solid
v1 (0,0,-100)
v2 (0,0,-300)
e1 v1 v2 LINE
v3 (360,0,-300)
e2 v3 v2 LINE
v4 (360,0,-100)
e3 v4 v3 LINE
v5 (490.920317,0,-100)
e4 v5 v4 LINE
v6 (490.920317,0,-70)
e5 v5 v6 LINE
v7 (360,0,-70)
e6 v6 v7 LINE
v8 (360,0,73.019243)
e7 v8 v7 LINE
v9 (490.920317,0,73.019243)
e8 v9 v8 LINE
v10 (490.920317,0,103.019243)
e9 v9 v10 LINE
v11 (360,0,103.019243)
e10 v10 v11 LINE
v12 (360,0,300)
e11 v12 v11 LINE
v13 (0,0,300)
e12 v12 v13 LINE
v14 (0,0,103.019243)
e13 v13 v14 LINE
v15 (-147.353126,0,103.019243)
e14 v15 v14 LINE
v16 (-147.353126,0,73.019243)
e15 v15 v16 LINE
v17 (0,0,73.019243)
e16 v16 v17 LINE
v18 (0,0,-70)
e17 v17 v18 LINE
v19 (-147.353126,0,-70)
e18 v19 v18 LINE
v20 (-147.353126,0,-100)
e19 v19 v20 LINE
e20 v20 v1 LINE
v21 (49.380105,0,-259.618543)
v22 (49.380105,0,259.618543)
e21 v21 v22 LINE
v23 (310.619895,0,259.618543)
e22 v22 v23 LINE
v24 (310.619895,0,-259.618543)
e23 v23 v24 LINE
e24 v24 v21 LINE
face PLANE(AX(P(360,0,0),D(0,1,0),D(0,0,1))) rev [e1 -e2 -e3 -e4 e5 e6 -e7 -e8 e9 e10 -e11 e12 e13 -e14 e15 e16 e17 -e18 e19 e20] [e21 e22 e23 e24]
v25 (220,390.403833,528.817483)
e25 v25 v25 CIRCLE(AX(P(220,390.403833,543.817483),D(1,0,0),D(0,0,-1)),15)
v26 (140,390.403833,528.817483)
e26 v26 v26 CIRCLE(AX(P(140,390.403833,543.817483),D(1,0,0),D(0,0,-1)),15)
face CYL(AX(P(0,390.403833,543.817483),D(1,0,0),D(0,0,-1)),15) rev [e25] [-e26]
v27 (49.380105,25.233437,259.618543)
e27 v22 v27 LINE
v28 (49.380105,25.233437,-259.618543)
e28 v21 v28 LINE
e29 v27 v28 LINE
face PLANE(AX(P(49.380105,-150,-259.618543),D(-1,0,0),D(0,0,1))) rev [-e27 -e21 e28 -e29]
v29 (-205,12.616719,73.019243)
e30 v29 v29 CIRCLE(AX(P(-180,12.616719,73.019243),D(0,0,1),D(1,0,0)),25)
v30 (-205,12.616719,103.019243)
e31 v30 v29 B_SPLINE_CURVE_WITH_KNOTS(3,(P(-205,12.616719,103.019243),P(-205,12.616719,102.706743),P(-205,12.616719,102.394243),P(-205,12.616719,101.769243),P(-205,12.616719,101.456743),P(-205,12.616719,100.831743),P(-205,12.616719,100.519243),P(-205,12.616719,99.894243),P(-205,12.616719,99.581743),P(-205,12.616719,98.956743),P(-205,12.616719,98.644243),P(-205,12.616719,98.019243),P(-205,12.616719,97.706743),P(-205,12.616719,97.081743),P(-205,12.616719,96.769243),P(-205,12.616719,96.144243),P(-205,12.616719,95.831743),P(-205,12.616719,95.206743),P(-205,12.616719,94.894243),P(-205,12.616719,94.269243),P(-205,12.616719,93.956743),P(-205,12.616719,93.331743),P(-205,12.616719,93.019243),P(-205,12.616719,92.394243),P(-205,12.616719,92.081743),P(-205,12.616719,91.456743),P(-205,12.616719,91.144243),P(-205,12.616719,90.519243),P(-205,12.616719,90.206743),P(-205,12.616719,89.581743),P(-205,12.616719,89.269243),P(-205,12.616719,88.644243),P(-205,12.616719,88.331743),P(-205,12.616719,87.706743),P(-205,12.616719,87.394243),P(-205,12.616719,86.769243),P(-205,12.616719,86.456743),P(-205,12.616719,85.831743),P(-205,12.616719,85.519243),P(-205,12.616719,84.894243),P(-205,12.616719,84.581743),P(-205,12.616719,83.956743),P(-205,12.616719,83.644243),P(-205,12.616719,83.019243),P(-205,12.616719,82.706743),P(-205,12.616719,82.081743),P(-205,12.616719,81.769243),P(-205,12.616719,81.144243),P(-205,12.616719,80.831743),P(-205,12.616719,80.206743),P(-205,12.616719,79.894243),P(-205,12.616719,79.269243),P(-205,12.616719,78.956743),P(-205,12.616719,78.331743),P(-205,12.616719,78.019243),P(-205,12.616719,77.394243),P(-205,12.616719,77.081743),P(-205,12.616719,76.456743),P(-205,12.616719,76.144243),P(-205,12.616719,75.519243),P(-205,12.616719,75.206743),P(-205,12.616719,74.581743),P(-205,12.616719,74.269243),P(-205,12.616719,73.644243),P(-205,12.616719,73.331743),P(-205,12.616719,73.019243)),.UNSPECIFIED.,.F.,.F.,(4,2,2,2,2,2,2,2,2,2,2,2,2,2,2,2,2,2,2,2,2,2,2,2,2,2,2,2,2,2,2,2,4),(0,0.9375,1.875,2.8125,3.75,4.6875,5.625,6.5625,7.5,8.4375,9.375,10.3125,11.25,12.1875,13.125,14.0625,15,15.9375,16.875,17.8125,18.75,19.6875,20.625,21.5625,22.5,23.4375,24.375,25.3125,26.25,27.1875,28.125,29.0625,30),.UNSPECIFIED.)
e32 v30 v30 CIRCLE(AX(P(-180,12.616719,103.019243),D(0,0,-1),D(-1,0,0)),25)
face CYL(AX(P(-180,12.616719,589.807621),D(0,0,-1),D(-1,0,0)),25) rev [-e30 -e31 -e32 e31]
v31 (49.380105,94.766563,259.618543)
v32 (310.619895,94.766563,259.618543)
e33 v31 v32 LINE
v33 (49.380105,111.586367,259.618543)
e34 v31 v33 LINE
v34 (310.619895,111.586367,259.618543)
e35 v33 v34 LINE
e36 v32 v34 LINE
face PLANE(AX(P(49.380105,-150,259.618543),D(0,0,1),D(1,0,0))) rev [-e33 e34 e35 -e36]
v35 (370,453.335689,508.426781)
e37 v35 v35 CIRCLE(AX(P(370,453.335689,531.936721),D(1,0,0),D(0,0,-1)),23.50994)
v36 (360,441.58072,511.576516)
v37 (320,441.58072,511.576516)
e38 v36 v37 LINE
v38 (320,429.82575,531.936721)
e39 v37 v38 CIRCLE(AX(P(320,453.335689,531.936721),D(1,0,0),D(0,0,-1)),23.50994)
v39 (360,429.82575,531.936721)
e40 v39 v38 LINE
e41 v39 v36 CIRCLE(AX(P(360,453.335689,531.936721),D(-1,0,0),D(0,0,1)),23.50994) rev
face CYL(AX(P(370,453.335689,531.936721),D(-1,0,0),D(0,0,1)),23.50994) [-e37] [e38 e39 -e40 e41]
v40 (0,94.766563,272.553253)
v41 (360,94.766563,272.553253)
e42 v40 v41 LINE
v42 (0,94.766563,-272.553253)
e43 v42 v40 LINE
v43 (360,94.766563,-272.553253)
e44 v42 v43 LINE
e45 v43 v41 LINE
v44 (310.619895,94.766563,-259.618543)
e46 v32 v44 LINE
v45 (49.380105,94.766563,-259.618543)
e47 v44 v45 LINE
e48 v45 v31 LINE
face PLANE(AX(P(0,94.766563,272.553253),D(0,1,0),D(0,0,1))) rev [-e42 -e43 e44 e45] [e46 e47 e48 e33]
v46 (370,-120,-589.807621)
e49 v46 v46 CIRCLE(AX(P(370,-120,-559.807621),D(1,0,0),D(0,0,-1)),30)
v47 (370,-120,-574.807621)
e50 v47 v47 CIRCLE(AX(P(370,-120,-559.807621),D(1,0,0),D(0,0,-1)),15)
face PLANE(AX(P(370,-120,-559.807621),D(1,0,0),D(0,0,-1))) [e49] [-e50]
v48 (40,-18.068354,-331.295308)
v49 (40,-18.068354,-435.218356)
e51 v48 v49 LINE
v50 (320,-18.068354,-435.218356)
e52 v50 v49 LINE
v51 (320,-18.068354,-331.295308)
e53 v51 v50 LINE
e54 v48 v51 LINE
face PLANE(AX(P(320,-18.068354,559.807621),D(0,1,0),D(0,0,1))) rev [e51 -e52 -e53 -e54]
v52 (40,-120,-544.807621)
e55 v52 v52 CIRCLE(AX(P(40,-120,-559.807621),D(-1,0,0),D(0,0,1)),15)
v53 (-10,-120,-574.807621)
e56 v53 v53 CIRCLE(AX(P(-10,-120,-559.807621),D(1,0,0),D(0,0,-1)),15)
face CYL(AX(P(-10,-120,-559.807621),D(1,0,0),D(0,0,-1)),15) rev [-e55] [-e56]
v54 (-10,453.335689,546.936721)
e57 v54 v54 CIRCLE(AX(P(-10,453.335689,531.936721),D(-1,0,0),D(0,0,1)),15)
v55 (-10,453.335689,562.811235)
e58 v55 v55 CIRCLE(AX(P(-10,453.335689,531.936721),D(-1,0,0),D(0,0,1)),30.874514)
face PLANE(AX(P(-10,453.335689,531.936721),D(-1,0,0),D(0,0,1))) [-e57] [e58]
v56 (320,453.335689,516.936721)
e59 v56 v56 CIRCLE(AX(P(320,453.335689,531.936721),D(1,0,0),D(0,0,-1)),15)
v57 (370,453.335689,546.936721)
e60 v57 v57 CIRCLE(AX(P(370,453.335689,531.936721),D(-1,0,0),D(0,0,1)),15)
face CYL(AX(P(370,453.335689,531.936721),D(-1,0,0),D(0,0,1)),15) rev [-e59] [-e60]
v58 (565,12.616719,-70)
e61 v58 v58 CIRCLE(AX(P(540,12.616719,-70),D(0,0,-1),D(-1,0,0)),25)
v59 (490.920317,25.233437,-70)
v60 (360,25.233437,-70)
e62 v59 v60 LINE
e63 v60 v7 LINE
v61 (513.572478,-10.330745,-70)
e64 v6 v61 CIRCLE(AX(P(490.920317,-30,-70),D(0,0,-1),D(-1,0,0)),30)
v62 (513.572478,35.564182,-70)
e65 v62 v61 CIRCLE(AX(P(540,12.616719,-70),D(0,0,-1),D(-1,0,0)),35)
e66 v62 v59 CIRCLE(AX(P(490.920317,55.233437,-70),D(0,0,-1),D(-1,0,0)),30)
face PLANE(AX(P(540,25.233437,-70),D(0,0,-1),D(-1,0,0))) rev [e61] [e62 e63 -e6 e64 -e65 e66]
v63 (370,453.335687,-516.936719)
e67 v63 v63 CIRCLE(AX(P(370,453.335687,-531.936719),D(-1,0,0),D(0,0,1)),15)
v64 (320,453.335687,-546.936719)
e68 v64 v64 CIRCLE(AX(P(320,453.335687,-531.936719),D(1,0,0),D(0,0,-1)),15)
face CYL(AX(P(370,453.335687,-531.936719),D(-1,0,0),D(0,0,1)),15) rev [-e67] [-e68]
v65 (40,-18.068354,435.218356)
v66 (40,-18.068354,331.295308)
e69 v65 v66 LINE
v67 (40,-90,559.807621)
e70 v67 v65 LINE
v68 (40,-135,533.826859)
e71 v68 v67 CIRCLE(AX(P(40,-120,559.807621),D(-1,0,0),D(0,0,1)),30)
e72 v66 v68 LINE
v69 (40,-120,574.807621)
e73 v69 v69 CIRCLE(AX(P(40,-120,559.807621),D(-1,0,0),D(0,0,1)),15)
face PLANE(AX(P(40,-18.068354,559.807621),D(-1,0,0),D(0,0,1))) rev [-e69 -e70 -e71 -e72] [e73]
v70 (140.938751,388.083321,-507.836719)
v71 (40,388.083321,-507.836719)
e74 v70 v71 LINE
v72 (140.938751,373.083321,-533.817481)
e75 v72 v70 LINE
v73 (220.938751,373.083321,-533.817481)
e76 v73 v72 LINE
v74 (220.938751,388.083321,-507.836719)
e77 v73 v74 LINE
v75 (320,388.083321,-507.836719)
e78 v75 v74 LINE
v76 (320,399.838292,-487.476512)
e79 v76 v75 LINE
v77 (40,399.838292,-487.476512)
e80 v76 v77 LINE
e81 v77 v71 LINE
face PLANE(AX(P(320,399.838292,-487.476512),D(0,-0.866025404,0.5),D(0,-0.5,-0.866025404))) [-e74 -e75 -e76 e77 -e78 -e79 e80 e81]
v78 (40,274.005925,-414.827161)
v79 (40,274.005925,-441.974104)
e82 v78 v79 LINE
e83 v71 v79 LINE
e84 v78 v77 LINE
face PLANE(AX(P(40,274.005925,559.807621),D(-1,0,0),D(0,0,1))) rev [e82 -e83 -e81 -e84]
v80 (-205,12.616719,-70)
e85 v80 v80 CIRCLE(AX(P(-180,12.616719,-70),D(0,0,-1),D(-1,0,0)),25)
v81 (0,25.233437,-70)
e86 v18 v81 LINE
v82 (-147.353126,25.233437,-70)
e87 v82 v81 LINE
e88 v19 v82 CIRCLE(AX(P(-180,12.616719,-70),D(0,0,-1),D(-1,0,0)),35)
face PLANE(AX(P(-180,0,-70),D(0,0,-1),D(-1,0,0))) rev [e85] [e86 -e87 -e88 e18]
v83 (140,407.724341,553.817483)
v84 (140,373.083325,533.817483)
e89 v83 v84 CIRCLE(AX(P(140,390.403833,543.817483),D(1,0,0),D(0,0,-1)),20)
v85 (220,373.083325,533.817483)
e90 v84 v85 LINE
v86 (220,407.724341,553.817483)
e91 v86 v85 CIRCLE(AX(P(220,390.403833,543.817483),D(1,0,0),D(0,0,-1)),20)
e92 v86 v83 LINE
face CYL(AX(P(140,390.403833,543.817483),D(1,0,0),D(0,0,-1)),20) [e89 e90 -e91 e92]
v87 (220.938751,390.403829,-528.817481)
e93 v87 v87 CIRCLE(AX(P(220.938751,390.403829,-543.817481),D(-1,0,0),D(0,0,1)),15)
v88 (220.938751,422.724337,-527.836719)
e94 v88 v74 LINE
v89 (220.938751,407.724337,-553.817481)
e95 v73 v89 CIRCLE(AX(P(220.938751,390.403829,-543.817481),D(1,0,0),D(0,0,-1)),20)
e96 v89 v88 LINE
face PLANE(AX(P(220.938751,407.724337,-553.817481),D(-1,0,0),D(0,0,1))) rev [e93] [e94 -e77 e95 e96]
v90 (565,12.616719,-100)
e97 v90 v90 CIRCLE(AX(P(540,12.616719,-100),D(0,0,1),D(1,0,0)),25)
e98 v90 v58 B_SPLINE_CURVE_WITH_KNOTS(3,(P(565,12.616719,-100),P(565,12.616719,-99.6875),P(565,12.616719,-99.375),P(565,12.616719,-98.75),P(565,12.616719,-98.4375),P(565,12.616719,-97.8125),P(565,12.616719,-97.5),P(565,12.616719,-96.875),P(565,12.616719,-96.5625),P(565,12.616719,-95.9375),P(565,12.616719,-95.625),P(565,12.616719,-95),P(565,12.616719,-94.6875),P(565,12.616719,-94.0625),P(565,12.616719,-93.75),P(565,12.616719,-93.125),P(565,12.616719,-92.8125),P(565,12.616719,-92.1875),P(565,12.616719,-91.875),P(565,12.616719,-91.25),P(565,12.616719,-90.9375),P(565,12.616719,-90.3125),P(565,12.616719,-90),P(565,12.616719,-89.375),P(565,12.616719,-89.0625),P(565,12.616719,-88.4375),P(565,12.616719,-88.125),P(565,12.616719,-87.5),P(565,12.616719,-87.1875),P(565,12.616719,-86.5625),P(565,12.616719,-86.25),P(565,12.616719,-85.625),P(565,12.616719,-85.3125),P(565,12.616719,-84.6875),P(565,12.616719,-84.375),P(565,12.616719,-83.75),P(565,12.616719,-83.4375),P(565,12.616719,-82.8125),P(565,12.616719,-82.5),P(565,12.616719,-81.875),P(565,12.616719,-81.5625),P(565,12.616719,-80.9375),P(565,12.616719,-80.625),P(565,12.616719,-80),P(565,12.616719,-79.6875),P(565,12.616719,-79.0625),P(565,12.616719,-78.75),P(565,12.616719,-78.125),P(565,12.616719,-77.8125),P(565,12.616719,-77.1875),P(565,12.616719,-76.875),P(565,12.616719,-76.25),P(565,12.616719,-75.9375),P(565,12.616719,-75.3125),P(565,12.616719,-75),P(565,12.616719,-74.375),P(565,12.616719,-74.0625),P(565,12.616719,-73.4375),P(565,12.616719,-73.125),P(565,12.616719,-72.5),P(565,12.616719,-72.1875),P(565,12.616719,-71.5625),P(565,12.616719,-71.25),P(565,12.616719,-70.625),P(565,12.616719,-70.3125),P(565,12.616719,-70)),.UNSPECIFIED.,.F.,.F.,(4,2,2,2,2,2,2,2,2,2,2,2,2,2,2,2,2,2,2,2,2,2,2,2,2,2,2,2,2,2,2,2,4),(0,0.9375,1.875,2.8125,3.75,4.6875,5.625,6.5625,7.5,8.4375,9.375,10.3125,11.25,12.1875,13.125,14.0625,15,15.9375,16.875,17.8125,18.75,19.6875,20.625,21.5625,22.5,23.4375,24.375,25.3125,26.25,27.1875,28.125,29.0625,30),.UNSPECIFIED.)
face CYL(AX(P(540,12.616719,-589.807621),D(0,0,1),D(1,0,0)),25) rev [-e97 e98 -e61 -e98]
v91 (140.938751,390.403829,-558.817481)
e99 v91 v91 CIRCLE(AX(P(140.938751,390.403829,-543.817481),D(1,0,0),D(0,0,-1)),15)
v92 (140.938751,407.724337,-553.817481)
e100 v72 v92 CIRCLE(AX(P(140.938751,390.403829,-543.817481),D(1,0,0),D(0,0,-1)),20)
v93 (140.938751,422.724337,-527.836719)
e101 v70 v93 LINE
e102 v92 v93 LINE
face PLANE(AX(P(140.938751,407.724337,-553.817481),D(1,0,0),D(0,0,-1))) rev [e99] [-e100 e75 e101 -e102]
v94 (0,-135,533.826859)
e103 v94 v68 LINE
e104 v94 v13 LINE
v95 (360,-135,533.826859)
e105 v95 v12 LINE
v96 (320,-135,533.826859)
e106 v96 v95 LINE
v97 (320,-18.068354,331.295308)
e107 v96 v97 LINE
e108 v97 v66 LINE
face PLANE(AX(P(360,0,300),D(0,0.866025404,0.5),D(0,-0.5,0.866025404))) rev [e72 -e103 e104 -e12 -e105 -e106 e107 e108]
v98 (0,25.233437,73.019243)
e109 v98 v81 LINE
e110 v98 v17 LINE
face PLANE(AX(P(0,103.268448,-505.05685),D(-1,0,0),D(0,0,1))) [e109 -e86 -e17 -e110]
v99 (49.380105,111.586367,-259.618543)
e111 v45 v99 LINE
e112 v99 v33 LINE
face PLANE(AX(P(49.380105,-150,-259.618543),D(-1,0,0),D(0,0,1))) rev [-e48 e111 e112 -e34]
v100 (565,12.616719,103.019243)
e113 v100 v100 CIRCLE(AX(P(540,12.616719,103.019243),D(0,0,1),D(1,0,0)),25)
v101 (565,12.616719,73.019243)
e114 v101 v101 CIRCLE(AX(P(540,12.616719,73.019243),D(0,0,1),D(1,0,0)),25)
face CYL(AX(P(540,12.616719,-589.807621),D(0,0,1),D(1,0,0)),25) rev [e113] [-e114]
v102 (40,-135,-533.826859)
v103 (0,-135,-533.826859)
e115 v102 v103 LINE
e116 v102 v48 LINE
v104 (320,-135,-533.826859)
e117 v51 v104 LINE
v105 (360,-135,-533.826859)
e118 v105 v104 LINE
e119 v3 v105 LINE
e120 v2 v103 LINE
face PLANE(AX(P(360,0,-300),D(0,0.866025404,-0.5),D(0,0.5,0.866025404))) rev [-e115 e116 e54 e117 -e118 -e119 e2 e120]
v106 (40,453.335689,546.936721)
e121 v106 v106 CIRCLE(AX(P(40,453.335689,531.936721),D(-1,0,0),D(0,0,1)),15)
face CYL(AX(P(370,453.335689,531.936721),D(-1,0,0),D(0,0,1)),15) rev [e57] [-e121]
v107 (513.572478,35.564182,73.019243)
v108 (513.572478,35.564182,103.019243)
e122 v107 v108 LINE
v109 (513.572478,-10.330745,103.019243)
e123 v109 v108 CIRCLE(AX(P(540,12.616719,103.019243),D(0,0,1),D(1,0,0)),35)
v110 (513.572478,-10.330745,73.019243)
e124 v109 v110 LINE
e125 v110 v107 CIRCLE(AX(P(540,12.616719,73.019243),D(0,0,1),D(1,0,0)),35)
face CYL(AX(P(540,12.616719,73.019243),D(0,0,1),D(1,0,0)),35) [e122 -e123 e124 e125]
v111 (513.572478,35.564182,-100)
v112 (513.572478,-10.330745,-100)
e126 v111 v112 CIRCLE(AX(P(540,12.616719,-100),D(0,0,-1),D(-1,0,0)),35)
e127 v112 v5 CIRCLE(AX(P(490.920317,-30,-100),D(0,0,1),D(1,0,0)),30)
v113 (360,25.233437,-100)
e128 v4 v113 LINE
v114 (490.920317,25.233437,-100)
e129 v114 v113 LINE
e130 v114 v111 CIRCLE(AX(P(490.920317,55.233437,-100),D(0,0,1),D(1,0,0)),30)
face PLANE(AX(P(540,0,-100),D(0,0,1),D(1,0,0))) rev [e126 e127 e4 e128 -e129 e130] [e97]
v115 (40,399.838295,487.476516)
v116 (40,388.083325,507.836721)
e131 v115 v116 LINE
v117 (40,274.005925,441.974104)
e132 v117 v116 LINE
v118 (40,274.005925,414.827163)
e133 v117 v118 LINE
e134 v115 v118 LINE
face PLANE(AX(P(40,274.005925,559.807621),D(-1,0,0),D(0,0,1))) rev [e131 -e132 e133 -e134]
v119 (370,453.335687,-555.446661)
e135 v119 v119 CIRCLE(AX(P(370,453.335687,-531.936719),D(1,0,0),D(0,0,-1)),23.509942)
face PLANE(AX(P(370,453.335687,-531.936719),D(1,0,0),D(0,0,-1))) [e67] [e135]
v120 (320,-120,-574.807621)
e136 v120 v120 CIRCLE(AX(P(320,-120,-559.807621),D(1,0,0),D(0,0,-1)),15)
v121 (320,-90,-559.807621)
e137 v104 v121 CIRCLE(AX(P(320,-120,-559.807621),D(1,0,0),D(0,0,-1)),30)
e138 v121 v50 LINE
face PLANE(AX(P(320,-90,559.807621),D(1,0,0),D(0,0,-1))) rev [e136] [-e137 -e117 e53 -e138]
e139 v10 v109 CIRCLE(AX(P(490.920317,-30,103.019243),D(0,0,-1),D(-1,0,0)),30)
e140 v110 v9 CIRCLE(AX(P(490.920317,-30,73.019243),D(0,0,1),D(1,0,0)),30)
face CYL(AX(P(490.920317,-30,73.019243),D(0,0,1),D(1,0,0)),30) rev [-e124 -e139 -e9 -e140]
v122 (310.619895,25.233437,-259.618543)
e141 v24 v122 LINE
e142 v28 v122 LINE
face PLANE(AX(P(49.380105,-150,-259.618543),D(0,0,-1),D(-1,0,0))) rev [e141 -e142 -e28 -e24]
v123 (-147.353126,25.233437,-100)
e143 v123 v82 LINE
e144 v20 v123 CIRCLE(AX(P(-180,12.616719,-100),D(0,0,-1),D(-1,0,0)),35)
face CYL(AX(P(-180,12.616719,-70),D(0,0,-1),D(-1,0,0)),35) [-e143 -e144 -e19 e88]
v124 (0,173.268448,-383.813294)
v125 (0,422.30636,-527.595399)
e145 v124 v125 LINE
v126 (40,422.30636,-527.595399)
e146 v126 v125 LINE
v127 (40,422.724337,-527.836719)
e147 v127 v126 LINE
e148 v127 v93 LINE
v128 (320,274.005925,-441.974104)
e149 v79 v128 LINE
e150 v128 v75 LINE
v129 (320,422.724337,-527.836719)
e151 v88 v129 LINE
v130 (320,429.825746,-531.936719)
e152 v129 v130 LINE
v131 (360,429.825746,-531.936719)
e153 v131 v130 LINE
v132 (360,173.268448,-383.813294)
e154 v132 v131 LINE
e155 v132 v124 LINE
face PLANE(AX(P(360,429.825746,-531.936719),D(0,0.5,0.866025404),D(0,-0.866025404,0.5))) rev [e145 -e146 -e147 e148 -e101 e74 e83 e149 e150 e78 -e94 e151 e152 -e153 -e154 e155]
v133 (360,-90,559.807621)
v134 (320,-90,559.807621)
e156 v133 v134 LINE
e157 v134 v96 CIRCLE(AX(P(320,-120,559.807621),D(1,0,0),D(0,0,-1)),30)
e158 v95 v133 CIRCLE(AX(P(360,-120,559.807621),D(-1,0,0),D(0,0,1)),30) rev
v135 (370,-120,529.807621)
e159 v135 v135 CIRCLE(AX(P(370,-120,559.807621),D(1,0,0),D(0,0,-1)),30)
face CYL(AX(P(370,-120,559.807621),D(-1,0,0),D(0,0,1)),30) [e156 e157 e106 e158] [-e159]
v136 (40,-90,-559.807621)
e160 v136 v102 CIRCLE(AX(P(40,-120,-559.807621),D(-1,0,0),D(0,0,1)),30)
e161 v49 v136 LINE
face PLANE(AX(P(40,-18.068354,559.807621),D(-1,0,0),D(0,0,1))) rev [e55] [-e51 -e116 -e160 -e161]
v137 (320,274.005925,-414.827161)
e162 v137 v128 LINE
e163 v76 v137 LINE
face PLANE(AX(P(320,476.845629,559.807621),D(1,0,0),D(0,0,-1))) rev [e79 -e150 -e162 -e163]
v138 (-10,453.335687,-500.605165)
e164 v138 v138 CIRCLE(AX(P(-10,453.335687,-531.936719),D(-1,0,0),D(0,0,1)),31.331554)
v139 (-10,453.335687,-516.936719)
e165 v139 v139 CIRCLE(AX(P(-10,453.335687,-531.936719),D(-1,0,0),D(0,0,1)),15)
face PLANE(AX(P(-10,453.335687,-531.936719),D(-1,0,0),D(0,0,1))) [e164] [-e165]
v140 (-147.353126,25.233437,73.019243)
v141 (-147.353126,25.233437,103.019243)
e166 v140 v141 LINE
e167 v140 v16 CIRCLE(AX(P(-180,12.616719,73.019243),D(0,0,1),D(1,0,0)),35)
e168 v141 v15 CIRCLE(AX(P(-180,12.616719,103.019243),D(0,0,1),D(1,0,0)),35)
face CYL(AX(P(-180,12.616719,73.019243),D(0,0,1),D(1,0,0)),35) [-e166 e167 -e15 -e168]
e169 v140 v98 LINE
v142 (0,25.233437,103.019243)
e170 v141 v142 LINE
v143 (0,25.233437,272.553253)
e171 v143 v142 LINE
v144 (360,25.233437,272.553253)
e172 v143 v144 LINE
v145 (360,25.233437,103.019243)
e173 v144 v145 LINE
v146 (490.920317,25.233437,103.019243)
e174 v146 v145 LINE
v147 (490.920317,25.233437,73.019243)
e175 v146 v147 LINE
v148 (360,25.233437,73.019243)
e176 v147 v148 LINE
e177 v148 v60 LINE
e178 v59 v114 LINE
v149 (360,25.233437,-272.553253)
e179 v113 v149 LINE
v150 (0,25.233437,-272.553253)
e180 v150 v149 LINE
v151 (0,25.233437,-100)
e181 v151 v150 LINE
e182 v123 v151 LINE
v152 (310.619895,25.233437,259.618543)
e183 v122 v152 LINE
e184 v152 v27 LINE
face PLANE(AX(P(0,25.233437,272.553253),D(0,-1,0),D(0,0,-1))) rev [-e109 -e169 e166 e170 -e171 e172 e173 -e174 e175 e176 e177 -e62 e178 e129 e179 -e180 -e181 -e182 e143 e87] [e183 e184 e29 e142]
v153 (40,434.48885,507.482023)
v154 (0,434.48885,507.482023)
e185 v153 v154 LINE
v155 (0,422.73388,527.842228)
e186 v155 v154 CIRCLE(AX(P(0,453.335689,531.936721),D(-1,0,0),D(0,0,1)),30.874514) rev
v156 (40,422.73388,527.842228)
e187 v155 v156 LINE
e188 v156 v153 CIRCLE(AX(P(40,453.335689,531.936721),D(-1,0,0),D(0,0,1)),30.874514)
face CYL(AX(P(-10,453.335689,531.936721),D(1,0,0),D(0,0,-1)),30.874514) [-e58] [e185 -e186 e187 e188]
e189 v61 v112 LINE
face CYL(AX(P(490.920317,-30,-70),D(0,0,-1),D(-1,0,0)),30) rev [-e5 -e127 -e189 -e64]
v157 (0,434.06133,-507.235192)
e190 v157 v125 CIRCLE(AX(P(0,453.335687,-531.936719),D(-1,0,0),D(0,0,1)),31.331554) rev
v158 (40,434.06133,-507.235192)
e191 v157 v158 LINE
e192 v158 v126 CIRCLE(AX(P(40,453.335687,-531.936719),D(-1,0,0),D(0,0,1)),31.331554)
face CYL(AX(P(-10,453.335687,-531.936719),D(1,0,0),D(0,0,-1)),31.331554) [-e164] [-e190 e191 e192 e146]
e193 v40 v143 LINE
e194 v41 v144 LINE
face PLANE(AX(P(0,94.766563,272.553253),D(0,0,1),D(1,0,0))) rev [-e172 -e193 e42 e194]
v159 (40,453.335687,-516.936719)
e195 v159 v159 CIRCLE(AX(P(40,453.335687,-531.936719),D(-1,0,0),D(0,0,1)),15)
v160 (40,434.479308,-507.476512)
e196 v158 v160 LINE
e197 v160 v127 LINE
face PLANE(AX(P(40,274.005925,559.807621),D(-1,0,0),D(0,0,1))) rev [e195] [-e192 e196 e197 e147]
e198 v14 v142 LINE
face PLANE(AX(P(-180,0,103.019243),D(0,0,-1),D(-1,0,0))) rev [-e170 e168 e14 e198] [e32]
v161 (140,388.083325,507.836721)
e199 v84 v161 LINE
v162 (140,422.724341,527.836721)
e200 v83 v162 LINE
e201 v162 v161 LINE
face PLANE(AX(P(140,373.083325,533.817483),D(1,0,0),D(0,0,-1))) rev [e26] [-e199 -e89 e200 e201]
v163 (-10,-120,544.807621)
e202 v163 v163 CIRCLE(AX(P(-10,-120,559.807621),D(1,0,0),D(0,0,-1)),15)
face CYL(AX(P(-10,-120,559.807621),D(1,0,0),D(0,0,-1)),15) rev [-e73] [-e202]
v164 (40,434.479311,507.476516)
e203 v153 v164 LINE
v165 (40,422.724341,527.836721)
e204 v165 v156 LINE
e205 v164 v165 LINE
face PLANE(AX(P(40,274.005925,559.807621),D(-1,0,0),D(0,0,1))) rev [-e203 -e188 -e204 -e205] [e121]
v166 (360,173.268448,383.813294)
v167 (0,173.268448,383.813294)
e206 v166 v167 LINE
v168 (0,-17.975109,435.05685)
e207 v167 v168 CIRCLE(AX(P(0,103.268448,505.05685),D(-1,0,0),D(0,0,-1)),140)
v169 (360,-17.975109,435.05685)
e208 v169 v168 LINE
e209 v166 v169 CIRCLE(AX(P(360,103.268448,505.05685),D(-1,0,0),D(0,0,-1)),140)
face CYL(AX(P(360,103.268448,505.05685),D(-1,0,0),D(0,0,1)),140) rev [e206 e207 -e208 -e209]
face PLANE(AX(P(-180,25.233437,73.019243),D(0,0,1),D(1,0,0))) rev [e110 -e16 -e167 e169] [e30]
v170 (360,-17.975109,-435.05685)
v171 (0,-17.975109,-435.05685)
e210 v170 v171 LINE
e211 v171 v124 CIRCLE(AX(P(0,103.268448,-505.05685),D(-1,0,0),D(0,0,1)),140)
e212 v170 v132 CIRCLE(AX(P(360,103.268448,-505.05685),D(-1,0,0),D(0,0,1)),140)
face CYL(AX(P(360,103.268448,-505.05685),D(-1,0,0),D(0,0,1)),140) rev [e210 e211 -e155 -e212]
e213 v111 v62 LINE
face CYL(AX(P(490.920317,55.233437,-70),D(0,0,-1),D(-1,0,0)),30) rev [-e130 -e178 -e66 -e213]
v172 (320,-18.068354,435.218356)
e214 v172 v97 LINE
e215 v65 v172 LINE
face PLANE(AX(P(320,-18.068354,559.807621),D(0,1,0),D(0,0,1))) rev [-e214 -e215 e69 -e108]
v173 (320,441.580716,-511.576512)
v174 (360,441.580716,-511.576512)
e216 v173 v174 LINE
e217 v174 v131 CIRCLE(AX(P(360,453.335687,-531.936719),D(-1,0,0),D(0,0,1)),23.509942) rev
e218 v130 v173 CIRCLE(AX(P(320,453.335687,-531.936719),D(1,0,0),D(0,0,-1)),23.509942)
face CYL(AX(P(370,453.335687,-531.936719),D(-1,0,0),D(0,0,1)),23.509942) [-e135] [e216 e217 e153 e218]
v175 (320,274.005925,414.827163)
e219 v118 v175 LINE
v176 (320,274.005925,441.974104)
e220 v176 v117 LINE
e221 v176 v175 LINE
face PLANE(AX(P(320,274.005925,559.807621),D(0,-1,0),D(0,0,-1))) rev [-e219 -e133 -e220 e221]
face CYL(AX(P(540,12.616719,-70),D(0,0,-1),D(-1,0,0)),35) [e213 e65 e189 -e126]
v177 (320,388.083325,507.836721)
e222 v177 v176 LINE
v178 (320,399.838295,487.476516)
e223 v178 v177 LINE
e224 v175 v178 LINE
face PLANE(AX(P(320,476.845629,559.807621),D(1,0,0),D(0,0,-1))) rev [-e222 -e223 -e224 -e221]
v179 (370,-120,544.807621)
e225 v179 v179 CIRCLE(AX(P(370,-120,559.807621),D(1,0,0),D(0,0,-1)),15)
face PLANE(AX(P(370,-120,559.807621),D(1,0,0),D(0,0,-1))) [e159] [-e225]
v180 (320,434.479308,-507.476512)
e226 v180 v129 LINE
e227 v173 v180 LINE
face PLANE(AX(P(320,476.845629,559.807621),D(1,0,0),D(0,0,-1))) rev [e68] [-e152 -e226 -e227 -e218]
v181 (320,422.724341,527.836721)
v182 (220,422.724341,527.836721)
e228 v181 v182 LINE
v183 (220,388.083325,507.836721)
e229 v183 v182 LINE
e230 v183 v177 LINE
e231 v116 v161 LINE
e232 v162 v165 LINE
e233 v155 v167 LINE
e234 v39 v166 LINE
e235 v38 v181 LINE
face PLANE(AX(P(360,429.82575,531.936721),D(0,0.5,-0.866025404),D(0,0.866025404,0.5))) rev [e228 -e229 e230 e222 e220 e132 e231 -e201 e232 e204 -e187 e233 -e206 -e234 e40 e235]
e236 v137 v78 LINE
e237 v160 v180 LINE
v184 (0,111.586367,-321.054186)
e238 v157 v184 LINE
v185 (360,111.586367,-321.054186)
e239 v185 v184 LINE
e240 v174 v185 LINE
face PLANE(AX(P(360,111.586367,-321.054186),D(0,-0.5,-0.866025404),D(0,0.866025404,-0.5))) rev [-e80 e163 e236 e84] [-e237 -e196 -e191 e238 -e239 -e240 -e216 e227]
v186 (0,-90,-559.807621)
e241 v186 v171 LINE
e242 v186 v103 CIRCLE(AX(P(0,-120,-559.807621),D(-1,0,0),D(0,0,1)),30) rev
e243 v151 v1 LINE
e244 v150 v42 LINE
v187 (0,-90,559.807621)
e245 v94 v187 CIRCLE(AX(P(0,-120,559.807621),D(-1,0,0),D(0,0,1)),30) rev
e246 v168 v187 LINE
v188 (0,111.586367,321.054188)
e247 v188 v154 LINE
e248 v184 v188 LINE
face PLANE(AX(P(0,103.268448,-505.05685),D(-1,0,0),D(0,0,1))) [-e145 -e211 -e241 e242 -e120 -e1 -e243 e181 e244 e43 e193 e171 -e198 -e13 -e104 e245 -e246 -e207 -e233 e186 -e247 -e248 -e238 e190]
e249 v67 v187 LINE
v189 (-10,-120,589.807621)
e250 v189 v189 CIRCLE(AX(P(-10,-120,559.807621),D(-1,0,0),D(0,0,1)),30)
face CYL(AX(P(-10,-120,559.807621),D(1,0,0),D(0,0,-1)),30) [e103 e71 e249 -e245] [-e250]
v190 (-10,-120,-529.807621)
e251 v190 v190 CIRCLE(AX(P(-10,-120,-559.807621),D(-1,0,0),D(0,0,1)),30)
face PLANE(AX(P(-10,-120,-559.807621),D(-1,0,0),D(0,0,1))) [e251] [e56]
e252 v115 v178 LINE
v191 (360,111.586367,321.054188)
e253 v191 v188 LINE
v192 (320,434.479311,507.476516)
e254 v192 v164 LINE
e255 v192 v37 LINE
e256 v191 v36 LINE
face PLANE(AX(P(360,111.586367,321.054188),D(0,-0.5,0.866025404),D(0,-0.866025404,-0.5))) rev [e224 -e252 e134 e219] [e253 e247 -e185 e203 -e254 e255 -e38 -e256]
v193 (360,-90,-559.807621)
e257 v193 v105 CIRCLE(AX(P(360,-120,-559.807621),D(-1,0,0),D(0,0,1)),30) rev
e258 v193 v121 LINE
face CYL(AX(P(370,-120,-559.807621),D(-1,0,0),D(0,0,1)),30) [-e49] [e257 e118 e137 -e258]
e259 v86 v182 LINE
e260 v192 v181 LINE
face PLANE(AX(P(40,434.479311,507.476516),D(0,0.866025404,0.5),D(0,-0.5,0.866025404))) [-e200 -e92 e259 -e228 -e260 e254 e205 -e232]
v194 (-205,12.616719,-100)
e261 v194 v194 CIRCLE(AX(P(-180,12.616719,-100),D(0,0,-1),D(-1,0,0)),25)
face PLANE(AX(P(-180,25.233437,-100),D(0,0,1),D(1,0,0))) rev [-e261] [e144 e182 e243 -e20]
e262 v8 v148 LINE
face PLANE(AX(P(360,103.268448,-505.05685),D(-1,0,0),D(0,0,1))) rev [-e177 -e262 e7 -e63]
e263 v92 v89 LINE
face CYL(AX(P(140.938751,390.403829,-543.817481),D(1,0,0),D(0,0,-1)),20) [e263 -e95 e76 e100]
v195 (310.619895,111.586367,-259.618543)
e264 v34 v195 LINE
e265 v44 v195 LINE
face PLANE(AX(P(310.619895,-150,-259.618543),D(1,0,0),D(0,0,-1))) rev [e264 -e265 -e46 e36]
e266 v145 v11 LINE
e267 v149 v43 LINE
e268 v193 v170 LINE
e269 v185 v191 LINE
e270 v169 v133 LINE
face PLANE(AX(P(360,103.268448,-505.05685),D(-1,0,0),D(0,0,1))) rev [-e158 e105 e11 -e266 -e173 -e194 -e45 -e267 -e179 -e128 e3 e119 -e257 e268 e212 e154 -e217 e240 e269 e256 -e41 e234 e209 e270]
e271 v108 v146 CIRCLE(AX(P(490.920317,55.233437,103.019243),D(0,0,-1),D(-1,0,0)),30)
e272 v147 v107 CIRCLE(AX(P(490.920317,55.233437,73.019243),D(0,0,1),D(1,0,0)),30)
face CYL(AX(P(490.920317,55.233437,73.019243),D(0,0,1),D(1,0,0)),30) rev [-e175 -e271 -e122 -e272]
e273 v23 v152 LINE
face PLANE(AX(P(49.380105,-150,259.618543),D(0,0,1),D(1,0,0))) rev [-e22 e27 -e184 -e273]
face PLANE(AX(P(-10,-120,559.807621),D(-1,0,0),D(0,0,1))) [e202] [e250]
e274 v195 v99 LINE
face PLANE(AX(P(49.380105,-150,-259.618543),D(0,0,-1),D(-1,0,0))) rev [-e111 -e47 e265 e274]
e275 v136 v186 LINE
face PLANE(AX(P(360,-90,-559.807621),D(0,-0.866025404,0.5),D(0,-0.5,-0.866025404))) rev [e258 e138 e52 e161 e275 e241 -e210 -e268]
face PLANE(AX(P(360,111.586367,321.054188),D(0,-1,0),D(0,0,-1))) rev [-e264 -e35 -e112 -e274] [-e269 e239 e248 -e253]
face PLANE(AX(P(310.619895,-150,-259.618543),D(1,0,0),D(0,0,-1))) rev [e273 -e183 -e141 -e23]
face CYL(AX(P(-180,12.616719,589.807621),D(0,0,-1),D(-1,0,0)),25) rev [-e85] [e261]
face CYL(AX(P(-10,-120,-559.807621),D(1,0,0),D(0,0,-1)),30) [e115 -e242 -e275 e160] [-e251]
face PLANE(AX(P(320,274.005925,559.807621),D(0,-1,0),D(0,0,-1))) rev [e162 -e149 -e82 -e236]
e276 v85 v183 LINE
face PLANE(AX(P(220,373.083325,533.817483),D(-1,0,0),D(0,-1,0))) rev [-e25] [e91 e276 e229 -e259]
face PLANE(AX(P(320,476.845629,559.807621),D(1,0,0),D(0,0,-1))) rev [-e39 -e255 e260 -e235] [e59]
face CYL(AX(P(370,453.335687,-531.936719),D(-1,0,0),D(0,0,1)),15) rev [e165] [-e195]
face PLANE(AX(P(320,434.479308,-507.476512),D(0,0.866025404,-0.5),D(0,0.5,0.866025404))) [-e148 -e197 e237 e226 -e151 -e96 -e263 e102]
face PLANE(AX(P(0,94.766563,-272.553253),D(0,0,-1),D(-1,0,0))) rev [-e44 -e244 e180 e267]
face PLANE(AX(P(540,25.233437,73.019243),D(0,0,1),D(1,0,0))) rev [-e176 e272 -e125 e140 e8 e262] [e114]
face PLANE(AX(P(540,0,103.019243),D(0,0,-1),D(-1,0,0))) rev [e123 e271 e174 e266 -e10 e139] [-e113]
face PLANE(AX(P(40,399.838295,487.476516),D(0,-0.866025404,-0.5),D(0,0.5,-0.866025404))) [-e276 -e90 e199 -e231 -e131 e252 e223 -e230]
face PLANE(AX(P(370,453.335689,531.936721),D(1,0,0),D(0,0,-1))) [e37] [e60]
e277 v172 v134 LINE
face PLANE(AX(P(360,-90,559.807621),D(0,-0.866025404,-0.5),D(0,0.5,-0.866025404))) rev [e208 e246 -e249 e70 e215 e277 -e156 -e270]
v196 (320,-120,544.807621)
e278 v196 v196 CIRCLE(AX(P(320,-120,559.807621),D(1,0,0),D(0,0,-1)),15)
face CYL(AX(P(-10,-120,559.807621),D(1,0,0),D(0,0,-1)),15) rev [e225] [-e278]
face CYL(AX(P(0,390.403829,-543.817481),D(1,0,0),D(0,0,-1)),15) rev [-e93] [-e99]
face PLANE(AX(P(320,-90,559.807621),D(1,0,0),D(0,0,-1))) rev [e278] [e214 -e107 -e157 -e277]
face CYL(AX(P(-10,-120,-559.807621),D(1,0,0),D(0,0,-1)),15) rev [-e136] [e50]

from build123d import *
from build123d.topology import SkipClean

# Parameters (mm, degrees)
BOSS_EXTRUDE2_DEPTH     = 360
SKETCH3_W               = 545.106506056
SKETCH3_H               = 69.533125986
CUT_EXTRUDE1_DEPTH      = 360
SKETCH4_W               = 261.239789208
SKETCH4_H               = 519.237085056
CUT_EXTRUDE2_DEPTH      = 760.209392128
CUT_EXTRUDE4_DEPTH      = 1270.062663896
CUT_EXTRUDE4_DEPTH_BACK = 1270.062663896
SKETCH5_W               = 280
SKETCH5_H               = 202.839703821
SKETCH6_W               = 280
SKETCH6_H               = 40
BOSS_EXTRUDE3_DEPTH     = 23.50994
SKETCH8_W               = 280
SKETCH8_H               = 40
BOSS_EXTRUDE4_DEPTH     = 23.509942
SKETCH9_W               = 80
SKETCH9_H               = 40
BOSS_EXTRUDE5_DEPTH     = 30
SKETCH10_W              = 80
SKETCH10_H              = 40
BOSS_EXTRUDE6_DEPTH     = 30
BOSS_EXTRUDE8_START     = -80
SKETCH13_R              = 20
BOSS_EXTRUDE8_DEPTH     = 80
CUT_EXTRUDE5_DEPTH      = 771.769639674
CUT_EXTRUDE5_DEPTH_BACK = 771.769639674
SKETCH14_R              = 15
BOSS_EXTRUDE9_START     = -80
SKETCH15_R              = 20
BOSS_EXTRUDE9_DEPTH     = 80
SKETCH16_R              = 15
CUT_EXTRUDE6_DEPTH      = 771.501076275
BOSS_EXTRUDE10_START    = -40
SKETCH17_R              = 30
BOSS_EXTRUDE10_DEPTH    = 50
BOSS_EXTRUDE11_START    = -40
SKETCH18_R              = 30
BOSS_EXTRUDE11_DEPTH    = 50
BOSS_EXTRUDE12_START    = -40
SKETCH19_R              = 30
BOSS_EXTRUDE12_DEPTH    = 50
BOSS_EXTRUDE13_START    = -40
SKETCH20_R              = 30
BOSS_EXTRUDE13_DEPTH    = 50
SKETCH21_R              = 15
CUT_EXTRUDE7_DEPTH      = 849.324692626
SKETCH22_R              = 15
CUT_EXTRUDE8_DEPTH      = 849.324692626
BOSS_EXTRUDE14_START    = -40
SKETCH23_R              = 23.509939841
BOSS_EXTRUDE14_DEPTH    = 50
BOSS_EXTRUDE15_START    = -40
SKETCH24_R              = 30.874513824
BOSS_EXTRUDE15_DEPTH    = 50
BOSS_EXTRUDE16_START    = -40
SKETCH25_R              = 23.509941867
BOSS_EXTRUDE16_DEPTH    = 50
BOSS_EXTRUDE17_START    = -40
SKETCH26_R              = 31.331553509
BOSS_EXTRUDE17_DEPTH    = 50
SKETCH27_R              = 15
CUT_EXTRUDE9_DEPTH      = 853.745779455
SKETCH28_R              = 15
CUT_EXTRUDE10_DEPTH     = 853.745779455
SKETCH30_W              = 30
SKETCH30_H              = 25.233437007
BOSS_EXTRUDE18_DEPTH    = 180
BOSS_EXTRUDE19_START    = -30
SKETCH31_R              = 35
BOSS_EXTRUDE19_DEPTH    = 30
BOSS_EXTRUDE20_START    = -30
SKETCH32_R              = 35
BOSS_EXTRUDE20_DEPTH    = 30
SKETCH33_R              = 25
CUT_EXTRUDE11_DEPTH     = 1023.514742227
FILLET1_R               = 30
SKETCH34_W              = 30
SKETCH34_H              = 25.233437007
BOSS_EXTRUDE21_DEPTH    = 180
BOSS_EXTRUDE22_START    = -30
SKETCH35_R              = 35
BOSS_EXTRUDE22_DEPTH    = 30
BOSS_EXTRUDE23_START    = -30
SKETCH36_R              = 35
BOSS_EXTRUDE23_DEPTH    = 30
SKETCH37_R              = 25
CUT_EXTRUDE12_DEPTH     = 1021.47140509


with BuildPart() as part:
    # Sketch1 → Boss-Extrude2 (new body)
    with BuildSketch(Plane(origin=(0, 0, 0), x_dir=(0, 0, -1), z_dir=(1, 0, 0))):
        with BuildLine():
            Line((0, 0), (-300, 0))
            Line((-300, 0), (-559.807621135, -150))
            Line((-559.807621135, -150), (-559.807621135, -90))
            Line((-559.807621135, -90), (-435.056850285, -17.975108868))
            ThreePointArc((-435.056850285, -17.975108868), (-369.827234604, 67.033781348), (-383.813293755, 173.268447662))
            Line((-383.813293755, 173.268447662), (-531.936721095, 429.825749606))
            Line((-531.936721095, 429.825749606), (-531.936721095, 476.845629287))
            Line((-531.936721095, 476.845629287), (-321.054187904, 111.586367372))
            Line((-321.054187904, 111.586367372), (321.054185564, 111.586367372))
            Line((321.054185564, 111.586367372), (531.936718755, 476.845629287))
            Line((531.936718755, 476.845629287), (531.936718755, 429.825745553))
            Line((531.936718755, 429.825745553), (383.813293755, 173.268447662))
            ThreePointArc((383.813293755, 173.268447662), (369.827234604, 67.033781348), (435.056850285, -17.975108868))
            Line((435.056850285, -17.975108868), (559.807621135, -90))
            Line((559.807621135, -90), (559.807621135, -150))
            Line((559.807621135, -150), (300, 0))
            Line((300, 0), (0, 0))
        make_face()
    extrude(amount=BOSS_EXTRUDE2_DEPTH)

    # Sketch3 → Cut-Extrude1 (cut)
    with BuildSketch(Plane(origin=(360, 0, 0), x_dir=(0, 0, -1), z_dir=(1, 0, 0))):
        with Locations((0, 60)):
            Rectangle(SKETCH3_W, SKETCH3_H)
    extrude(amount=-CUT_EXTRUDE1_DEPTH, mode=Mode.SUBTRACT)

    # Sketch4 → Cut-Extrude2 (cut, through all)
    with BuildSketch(Plane(origin=(0, 111.586367372, 0), x_dir=(1, 0, 0), z_dir=(0, 1, 0))):
        with Locations((180, 0)):
            Rectangle(SKETCH4_W, SKETCH4_H)
    extrude(amount=-CUT_EXTRUDE2_DEPTH, mode=Mode.SUBTRACT)

    # Sketch5 → Cut-Extrude4 (cut, two sides: drawn at the far end of the back side and taken through both)
    with BuildSketch(Plane(origin=(0, 0, -559.807621135), x_dir=(-1, 0, 0), z_dir=(0, 0, -1)).offset(-CUT_EXTRUDE4_DEPTH_BACK)):
        Polygon((-320, -90), (-320, -18.068354254), (-40, -18.068354254), (-40, -90), (-40, -150), (-320, -150), align=None)
        with Locations((-180, 375.425777377)):
            Rectangle(SKETCH5_W, SKETCH5_H)
    extrude(amount=CUT_EXTRUDE4_DEPTH + CUT_EXTRUDE4_DEPTH_BACK, mode=Mode.SUBTRACT)

    # Sketch6 → Boss-Extrude3 (add)
    with SkipClean():  # the faces are left unmerged after this step: merging them gives an invalid solid
        with BuildSketch(Plane(origin=(0, -122.878919435, 212.832531641), x_dir=(1, 0, 0), z_dir=(0, -0.5000000000000043, 0.8660254037844363))):
            with Locations((180, 610.008378907)):
                Rectangle(SKETCH6_W, SKETCH6_H)
        extrude(amount=-BOSS_EXTRUDE3_DEPTH)

    # Sketch8 → Boss-Extrude4 (add)
    with SkipClean():  # the faces are left unmerged after this step: merging them gives an invalid solid
        with BuildSketch(Plane(origin=(0, -122.878919435, -212.832531641), x_dir=(-1, 0, 0), z_dir=(0, -0.500000000000012, -0.8660254037844318))):
            with Locations((-180, 610.008374227)):
                Rectangle(SKETCH8_W, SKETCH8_H)
        extrude(amount=-BOSS_EXTRUDE4_DEPTH)

    # Sketch9 → Boss-Extrude5 (add)
    with SkipClean():  # the faces are left unmerged after this step: merging them gives an invalid solid
        with BuildSketch(Plane(origin=(0, -122.878919435, -212.832531641), x_dir=(-1, 0, 0), z_dir=(0, -0.500000000000012, -0.8660254037844318))):
            with Locations((-180.938750654, 610.008374227)):
                Rectangle(SKETCH9_W, SKETCH9_H)
        extrude(amount=BOSS_EXTRUDE5_DEPTH)

    # Sketch10 → Boss-Extrude6 (add)
    with SkipClean():  # the faces are left unmerged after this step: merging them gives an invalid solid
        with BuildSketch(Plane(origin=(0, -122.878919435, 212.832531641), x_dir=(1, 0, 0), z_dir=(0, -0.5000000000000043, 0.8660254037844363))):
            with Locations((180, 610.008378907)):
                Rectangle(SKETCH10_W, SKETCH10_H)
        extrude(amount=BOSS_EXTRUDE6_DEPTH)

    # Sketch13 → Boss-Extrude8 (add)
    with SkipClean():  # the faces are left unmerged after this step: merging them gives an invalid solid
        with BuildSketch(Plane(origin=(220.938750654, 0, 0), x_dir=(0, 0, -1), z_dir=(1, 0, 0)).offset(BOSS_EXTRUDE8_START)):
            with Locations((543.817480868, 390.403829166)):
                Circle(SKETCH13_R)
        extrude(amount=BOSS_EXTRUDE8_DEPTH)

    # Sketch14 → Cut-Extrude5 (cut, two sides: drawn at the far end of the back side and taken through both)
    with SkipClean():  # the faces are left unmerged after this step: merging them gives an invalid solid
        with BuildSketch(Plane(origin=(220.938750654, 0, 0), x_dir=(0, 0, -1), z_dir=(1, 0, 0)).offset(-CUT_EXTRUDE5_DEPTH_BACK)):
            with Locations((543.817480868, 390.403829166)):
                Circle(SKETCH14_R)
        extrude(amount=CUT_EXTRUDE5_DEPTH + CUT_EXTRUDE5_DEPTH_BACK, mode=Mode.SUBTRACT)

    # Sketch15 → Boss-Extrude9 (add)
    with SkipClean():  # the faces are left unmerged after this step: merging them gives an invalid solid
        with BuildSketch(Plane(origin=(220, 0, 0), x_dir=(0, 0, -1), z_dir=(1, 0, 0)).offset(BOSS_EXTRUDE9_START)):
            with Locations((-543.817483208, 390.403833219)):
                Circle(SKETCH15_R)
        extrude(amount=BOSS_EXTRUDE9_DEPTH)

    # Sketch16 → Cut-Extrude6 (cut, through all)
    with SkipClean():  # the faces are left unmerged after this step: merging them gives an invalid solid
        with BuildSketch(Plane(origin=(220, 0, 0), x_dir=(0, 0, -1), z_dir=(1, 0, 0))):
            with Locations((-543.817483208, 390.403833219)):
                Circle(SKETCH16_R)
        extrude(amount=-CUT_EXTRUDE6_DEPTH, mode=Mode.SUBTRACT)

    # Sketch17 → Boss-Extrude10 (add)
    with SkipClean():  # the faces are left unmerged after this step: merging them gives an invalid solid
        with BuildSketch(Plane(origin=(360, 0, 0), x_dir=(0, 0, -1), z_dir=(1, 0, 0)).offset(BOSS_EXTRUDE10_START)):
            with Locations(Location((-559.807621135, -120, 0), (0, 0, 90))):
                Circle(SKETCH17_R)
        extrude(amount=BOSS_EXTRUDE10_DEPTH)

    # Sketch18 → Boss-Extrude11 (add)
    with SkipClean():  # the faces are left unmerged after this step: merging them gives an invalid solid
        with BuildSketch(Plane.ZY.offset(BOSS_EXTRUDE11_START)):
            with Locations(Location((559.807621135, -120, 0), (0, 0, 90))):
                Circle(SKETCH18_R)
        extrude(amount=BOSS_EXTRUDE11_DEPTH)

    # Sketch19 → Boss-Extrude12 (add)
    with SkipClean():  # the faces are left unmerged after this step: merging them gives an invalid solid
        with BuildSketch(Plane(origin=(360, 0, 0), x_dir=(0, 0, -1), z_dir=(1, 0, 0)).offset(BOSS_EXTRUDE12_START)):
            with Locations(Location((559.807621135, -120, 0), (0, 0, 210))):
                Circle(SKETCH19_R)
        extrude(amount=BOSS_EXTRUDE12_DEPTH)

    # Sketch20 → Boss-Extrude13 (add)
    with SkipClean():  # the faces are left unmerged after this step: merging them gives an invalid solid
        with BuildSketch(Plane.ZY.offset(BOSS_EXTRUDE13_START)):
            with Locations(Location((-559.807621135, -120, 0), (0, 0, 330))):
                Circle(SKETCH20_R)
        extrude(amount=BOSS_EXTRUDE13_DEPTH)

    # Sketch21 → Cut-Extrude7 (cut, through all)
    with SkipClean():  # the faces are left unmerged after this step: merging them gives an invalid solid
        with BuildSketch(Plane(origin=(370, 0, 0), x_dir=(0, 0, -1), z_dir=(1, 0, 0))):
            with Locations((559.807621135, -120)):
                Circle(SKETCH21_R)
        extrude(amount=-CUT_EXTRUDE7_DEPTH, mode=Mode.SUBTRACT)

    # Sketch22 → Cut-Extrude8 (cut, through all)
    with SkipClean():  # the faces are left unmerged after this step: merging them gives an invalid solid
        with BuildSketch(Plane(origin=(370, 0, 0), x_dir=(0, 0, -1), z_dir=(1, 0, 0))):
            with Locations((-559.807621135, -120)):
                Circle(SKETCH22_R)
        extrude(amount=-CUT_EXTRUDE8_DEPTH, mode=Mode.SUBTRACT)

    # Sketch23 → Boss-Extrude14 (add)
    with SkipClean():  # the faces are left unmerged after this step: merging them gives an invalid solid
        with BuildSketch(Plane(origin=(360, 0, 0), x_dir=(0, 0, -1), z_dir=(1, 0, 0)).offset(BOSS_EXTRUDE14_START)):
            with Locations(Location((-531.936721095, 453.335689447, 0), (0, 0, 270))):
                Circle(SKETCH23_R)
        extrude(amount=BOSS_EXTRUDE14_DEPTH)

    # Sketch24 → Boss-Extrude15 (add)
    with SkipClean():  # the faces are left unmerged after this step: merging them gives an invalid solid
        with BuildSketch(Plane.ZY.offset(BOSS_EXTRUDE15_START)):
            with Locations(Location((531.936721095, 453.335689447, 0), (0, 0, 217.620858787))):
                Circle(SKETCH24_R)
        extrude(amount=BOSS_EXTRUDE15_DEPTH)

    # Sketch25 → Boss-Extrude16 (add)
    with SkipClean():  # the faces are left unmerged after this step: merging them gives an invalid solid
        with BuildSketch(Plane(origin=(360, 0, 0), x_dir=(0, 0, -1), z_dir=(1, 0, 0)).offset(BOSS_EXTRUDE16_START)):
            with Locations(Location((531.936718755, 453.33568742, 0), (0, 0, 210))):
                Circle(SKETCH25_R)
        extrude(amount=BOSS_EXTRUDE16_DEPTH)

    # Sketch26 → Boss-Extrude17 (add)
    with SkipClean():  # the faces are left unmerged after this step: merging them gives an invalid solid
        with BuildSketch(Plane.ZY.offset(BOSS_EXTRUDE17_START)):
            with Locations(Location((-531.936718755, 453.33568742, 0), (0, 0, 277.964564218))):
                Circle(SKETCH26_R)
        extrude(amount=BOSS_EXTRUDE17_DEPTH)

    # Sketch27 → Cut-Extrude9 (cut, through all)
    with SkipClean():  # the faces are left unmerged after this step: merging them gives an invalid solid
        with BuildSketch(Plane.ZY.offset(10)):
            with Locations((-531.936718755, 453.33568742)):
                Circle(SKETCH27_R)
        extrude(amount=-CUT_EXTRUDE9_DEPTH, mode=Mode.SUBTRACT)

    # Sketch28 → Cut-Extrude10 (cut, through all)
    with SkipClean():  # the faces are left unmerged after this step: merging them gives an invalid solid
        with BuildSketch(Plane.ZY.offset(10)):
            with Locations((531.936721095, 453.335689447)):
                Circle(SKETCH28_R)
        extrude(amount=-CUT_EXTRUDE10_DEPTH, mode=Mode.SUBTRACT)

    # Sketch30 → Boss-Extrude18 (add)
    with SkipClean():  # the faces are left unmerged after this step: merging them gives an invalid solid
        with BuildSketch(Plane(origin=(360, 0, 0), x_dir=(0, 0, -1), z_dir=(1, 0, 0))):
            with Locations((-88.019242982, 12.616718504)):
                Rectangle(SKETCH30_W, SKETCH30_H)
            with Locations((85, 12.616718504)):
                Rectangle(SKETCH30_W, SKETCH30_H)
        extrude(amount=BOSS_EXTRUDE18_DEPTH)

    # Sketch31 → Boss-Extrude19 (add)
    with SkipClean():  # the faces are left unmerged after this step: merging them gives an invalid solid
        with BuildSketch(Plane.XY.offset(103.019242982).offset(BOSS_EXTRUDE19_START)):
            with Locations((540, 12.616718504)):
                Circle(SKETCH31_R)
        extrude(amount=BOSS_EXTRUDE19_DEPTH)

    # Sketch32 → Boss-Extrude20 (add)
    with SkipClean():  # the faces are left unmerged after this step: merging them gives an invalid solid
        with BuildSketch(Plane(origin=(0, 0, -100), x_dir=(-1, 0, 0), z_dir=(0, 0, -1)).offset(BOSS_EXTRUDE20_START)):
            with Locations((-540, 12.616718504)):
                Circle(SKETCH32_R)
        extrude(amount=BOSS_EXTRUDE20_DEPTH)

    # Sketch33 → Cut-Extrude11 (cut, through all)
    with SkipClean():  # the faces are left unmerged after this step: merging them gives an invalid solid
        with BuildSketch(Plane.XY.offset(103.019242982)):
            with Locations((540, 12.616718504)):
                Circle(SKETCH33_R)
        extrude(amount=-CUT_EXTRUDE11_DEPTH, mode=Mode.SUBTRACT)

    # Fillet1
    fillet1_edges = [part.edges().sort_by_distance(p)[0] for p in [
        (507.353125506, 0, 88.019242982),
        (507.353125506, 25.233437007, 88.019242982),
        (507.353125506, 0, -85),
        (507.353125506, 25.233437007, -85),
    ]]
    fillet(fillet1_edges, radius=FILLET1_R)

    # Sketch34 → Boss-Extrude21 (add)
    with SkipClean():  # the faces are left unmerged after this step: merging them gives an invalid solid
        with BuildSketch(Plane.ZY):
            with Locations((-85, 12.616718504)):
                Rectangle(SKETCH34_W, SKETCH34_H)
            with Locations((88.019242982, 12.616718504)):
                Rectangle(SKETCH34_W, SKETCH34_H)
        extrude(amount=BOSS_EXTRUDE21_DEPTH)

    # Sketch35 → Boss-Extrude22 (add)
    with SkipClean():  # the faces are left unmerged after this step: merging them gives an invalid solid
        with BuildSketch(Plane.XY.offset(103.019242982).offset(BOSS_EXTRUDE22_START)):
            with Locations((-180, 12.616718504)):
                Circle(SKETCH35_R)
        extrude(amount=BOSS_EXTRUDE22_DEPTH)

    # Sketch36 → Boss-Extrude23 (add)
    with SkipClean():  # the faces are left unmerged after this step: merging them gives an invalid solid
        with BuildSketch(Plane(origin=(0, 0, -100), x_dir=(-1, 0, 0), z_dir=(0, 0, -1)).offset(BOSS_EXTRUDE23_START)):
            with Locations((180, 12.616718504)):
                Circle(SKETCH36_R)
        extrude(amount=BOSS_EXTRUDE23_DEPTH)

    # Sketch37 → Cut-Extrude12 (cut, through all)
    with SkipClean():  # the faces are left unmerged after this step: merging them gives an invalid solid
        with BuildSketch(Plane(origin=(0, 0, -100), x_dir=(-1, 0, 0), z_dir=(0, 0, -1))):
            with Locations((180, 12.616718504)):
                Circle(SKETCH37_R)
        extrude(amount=-CUT_EXTRUDE12_DEPTH, mode=Mode.SUBTRACT)


solid = part.part
